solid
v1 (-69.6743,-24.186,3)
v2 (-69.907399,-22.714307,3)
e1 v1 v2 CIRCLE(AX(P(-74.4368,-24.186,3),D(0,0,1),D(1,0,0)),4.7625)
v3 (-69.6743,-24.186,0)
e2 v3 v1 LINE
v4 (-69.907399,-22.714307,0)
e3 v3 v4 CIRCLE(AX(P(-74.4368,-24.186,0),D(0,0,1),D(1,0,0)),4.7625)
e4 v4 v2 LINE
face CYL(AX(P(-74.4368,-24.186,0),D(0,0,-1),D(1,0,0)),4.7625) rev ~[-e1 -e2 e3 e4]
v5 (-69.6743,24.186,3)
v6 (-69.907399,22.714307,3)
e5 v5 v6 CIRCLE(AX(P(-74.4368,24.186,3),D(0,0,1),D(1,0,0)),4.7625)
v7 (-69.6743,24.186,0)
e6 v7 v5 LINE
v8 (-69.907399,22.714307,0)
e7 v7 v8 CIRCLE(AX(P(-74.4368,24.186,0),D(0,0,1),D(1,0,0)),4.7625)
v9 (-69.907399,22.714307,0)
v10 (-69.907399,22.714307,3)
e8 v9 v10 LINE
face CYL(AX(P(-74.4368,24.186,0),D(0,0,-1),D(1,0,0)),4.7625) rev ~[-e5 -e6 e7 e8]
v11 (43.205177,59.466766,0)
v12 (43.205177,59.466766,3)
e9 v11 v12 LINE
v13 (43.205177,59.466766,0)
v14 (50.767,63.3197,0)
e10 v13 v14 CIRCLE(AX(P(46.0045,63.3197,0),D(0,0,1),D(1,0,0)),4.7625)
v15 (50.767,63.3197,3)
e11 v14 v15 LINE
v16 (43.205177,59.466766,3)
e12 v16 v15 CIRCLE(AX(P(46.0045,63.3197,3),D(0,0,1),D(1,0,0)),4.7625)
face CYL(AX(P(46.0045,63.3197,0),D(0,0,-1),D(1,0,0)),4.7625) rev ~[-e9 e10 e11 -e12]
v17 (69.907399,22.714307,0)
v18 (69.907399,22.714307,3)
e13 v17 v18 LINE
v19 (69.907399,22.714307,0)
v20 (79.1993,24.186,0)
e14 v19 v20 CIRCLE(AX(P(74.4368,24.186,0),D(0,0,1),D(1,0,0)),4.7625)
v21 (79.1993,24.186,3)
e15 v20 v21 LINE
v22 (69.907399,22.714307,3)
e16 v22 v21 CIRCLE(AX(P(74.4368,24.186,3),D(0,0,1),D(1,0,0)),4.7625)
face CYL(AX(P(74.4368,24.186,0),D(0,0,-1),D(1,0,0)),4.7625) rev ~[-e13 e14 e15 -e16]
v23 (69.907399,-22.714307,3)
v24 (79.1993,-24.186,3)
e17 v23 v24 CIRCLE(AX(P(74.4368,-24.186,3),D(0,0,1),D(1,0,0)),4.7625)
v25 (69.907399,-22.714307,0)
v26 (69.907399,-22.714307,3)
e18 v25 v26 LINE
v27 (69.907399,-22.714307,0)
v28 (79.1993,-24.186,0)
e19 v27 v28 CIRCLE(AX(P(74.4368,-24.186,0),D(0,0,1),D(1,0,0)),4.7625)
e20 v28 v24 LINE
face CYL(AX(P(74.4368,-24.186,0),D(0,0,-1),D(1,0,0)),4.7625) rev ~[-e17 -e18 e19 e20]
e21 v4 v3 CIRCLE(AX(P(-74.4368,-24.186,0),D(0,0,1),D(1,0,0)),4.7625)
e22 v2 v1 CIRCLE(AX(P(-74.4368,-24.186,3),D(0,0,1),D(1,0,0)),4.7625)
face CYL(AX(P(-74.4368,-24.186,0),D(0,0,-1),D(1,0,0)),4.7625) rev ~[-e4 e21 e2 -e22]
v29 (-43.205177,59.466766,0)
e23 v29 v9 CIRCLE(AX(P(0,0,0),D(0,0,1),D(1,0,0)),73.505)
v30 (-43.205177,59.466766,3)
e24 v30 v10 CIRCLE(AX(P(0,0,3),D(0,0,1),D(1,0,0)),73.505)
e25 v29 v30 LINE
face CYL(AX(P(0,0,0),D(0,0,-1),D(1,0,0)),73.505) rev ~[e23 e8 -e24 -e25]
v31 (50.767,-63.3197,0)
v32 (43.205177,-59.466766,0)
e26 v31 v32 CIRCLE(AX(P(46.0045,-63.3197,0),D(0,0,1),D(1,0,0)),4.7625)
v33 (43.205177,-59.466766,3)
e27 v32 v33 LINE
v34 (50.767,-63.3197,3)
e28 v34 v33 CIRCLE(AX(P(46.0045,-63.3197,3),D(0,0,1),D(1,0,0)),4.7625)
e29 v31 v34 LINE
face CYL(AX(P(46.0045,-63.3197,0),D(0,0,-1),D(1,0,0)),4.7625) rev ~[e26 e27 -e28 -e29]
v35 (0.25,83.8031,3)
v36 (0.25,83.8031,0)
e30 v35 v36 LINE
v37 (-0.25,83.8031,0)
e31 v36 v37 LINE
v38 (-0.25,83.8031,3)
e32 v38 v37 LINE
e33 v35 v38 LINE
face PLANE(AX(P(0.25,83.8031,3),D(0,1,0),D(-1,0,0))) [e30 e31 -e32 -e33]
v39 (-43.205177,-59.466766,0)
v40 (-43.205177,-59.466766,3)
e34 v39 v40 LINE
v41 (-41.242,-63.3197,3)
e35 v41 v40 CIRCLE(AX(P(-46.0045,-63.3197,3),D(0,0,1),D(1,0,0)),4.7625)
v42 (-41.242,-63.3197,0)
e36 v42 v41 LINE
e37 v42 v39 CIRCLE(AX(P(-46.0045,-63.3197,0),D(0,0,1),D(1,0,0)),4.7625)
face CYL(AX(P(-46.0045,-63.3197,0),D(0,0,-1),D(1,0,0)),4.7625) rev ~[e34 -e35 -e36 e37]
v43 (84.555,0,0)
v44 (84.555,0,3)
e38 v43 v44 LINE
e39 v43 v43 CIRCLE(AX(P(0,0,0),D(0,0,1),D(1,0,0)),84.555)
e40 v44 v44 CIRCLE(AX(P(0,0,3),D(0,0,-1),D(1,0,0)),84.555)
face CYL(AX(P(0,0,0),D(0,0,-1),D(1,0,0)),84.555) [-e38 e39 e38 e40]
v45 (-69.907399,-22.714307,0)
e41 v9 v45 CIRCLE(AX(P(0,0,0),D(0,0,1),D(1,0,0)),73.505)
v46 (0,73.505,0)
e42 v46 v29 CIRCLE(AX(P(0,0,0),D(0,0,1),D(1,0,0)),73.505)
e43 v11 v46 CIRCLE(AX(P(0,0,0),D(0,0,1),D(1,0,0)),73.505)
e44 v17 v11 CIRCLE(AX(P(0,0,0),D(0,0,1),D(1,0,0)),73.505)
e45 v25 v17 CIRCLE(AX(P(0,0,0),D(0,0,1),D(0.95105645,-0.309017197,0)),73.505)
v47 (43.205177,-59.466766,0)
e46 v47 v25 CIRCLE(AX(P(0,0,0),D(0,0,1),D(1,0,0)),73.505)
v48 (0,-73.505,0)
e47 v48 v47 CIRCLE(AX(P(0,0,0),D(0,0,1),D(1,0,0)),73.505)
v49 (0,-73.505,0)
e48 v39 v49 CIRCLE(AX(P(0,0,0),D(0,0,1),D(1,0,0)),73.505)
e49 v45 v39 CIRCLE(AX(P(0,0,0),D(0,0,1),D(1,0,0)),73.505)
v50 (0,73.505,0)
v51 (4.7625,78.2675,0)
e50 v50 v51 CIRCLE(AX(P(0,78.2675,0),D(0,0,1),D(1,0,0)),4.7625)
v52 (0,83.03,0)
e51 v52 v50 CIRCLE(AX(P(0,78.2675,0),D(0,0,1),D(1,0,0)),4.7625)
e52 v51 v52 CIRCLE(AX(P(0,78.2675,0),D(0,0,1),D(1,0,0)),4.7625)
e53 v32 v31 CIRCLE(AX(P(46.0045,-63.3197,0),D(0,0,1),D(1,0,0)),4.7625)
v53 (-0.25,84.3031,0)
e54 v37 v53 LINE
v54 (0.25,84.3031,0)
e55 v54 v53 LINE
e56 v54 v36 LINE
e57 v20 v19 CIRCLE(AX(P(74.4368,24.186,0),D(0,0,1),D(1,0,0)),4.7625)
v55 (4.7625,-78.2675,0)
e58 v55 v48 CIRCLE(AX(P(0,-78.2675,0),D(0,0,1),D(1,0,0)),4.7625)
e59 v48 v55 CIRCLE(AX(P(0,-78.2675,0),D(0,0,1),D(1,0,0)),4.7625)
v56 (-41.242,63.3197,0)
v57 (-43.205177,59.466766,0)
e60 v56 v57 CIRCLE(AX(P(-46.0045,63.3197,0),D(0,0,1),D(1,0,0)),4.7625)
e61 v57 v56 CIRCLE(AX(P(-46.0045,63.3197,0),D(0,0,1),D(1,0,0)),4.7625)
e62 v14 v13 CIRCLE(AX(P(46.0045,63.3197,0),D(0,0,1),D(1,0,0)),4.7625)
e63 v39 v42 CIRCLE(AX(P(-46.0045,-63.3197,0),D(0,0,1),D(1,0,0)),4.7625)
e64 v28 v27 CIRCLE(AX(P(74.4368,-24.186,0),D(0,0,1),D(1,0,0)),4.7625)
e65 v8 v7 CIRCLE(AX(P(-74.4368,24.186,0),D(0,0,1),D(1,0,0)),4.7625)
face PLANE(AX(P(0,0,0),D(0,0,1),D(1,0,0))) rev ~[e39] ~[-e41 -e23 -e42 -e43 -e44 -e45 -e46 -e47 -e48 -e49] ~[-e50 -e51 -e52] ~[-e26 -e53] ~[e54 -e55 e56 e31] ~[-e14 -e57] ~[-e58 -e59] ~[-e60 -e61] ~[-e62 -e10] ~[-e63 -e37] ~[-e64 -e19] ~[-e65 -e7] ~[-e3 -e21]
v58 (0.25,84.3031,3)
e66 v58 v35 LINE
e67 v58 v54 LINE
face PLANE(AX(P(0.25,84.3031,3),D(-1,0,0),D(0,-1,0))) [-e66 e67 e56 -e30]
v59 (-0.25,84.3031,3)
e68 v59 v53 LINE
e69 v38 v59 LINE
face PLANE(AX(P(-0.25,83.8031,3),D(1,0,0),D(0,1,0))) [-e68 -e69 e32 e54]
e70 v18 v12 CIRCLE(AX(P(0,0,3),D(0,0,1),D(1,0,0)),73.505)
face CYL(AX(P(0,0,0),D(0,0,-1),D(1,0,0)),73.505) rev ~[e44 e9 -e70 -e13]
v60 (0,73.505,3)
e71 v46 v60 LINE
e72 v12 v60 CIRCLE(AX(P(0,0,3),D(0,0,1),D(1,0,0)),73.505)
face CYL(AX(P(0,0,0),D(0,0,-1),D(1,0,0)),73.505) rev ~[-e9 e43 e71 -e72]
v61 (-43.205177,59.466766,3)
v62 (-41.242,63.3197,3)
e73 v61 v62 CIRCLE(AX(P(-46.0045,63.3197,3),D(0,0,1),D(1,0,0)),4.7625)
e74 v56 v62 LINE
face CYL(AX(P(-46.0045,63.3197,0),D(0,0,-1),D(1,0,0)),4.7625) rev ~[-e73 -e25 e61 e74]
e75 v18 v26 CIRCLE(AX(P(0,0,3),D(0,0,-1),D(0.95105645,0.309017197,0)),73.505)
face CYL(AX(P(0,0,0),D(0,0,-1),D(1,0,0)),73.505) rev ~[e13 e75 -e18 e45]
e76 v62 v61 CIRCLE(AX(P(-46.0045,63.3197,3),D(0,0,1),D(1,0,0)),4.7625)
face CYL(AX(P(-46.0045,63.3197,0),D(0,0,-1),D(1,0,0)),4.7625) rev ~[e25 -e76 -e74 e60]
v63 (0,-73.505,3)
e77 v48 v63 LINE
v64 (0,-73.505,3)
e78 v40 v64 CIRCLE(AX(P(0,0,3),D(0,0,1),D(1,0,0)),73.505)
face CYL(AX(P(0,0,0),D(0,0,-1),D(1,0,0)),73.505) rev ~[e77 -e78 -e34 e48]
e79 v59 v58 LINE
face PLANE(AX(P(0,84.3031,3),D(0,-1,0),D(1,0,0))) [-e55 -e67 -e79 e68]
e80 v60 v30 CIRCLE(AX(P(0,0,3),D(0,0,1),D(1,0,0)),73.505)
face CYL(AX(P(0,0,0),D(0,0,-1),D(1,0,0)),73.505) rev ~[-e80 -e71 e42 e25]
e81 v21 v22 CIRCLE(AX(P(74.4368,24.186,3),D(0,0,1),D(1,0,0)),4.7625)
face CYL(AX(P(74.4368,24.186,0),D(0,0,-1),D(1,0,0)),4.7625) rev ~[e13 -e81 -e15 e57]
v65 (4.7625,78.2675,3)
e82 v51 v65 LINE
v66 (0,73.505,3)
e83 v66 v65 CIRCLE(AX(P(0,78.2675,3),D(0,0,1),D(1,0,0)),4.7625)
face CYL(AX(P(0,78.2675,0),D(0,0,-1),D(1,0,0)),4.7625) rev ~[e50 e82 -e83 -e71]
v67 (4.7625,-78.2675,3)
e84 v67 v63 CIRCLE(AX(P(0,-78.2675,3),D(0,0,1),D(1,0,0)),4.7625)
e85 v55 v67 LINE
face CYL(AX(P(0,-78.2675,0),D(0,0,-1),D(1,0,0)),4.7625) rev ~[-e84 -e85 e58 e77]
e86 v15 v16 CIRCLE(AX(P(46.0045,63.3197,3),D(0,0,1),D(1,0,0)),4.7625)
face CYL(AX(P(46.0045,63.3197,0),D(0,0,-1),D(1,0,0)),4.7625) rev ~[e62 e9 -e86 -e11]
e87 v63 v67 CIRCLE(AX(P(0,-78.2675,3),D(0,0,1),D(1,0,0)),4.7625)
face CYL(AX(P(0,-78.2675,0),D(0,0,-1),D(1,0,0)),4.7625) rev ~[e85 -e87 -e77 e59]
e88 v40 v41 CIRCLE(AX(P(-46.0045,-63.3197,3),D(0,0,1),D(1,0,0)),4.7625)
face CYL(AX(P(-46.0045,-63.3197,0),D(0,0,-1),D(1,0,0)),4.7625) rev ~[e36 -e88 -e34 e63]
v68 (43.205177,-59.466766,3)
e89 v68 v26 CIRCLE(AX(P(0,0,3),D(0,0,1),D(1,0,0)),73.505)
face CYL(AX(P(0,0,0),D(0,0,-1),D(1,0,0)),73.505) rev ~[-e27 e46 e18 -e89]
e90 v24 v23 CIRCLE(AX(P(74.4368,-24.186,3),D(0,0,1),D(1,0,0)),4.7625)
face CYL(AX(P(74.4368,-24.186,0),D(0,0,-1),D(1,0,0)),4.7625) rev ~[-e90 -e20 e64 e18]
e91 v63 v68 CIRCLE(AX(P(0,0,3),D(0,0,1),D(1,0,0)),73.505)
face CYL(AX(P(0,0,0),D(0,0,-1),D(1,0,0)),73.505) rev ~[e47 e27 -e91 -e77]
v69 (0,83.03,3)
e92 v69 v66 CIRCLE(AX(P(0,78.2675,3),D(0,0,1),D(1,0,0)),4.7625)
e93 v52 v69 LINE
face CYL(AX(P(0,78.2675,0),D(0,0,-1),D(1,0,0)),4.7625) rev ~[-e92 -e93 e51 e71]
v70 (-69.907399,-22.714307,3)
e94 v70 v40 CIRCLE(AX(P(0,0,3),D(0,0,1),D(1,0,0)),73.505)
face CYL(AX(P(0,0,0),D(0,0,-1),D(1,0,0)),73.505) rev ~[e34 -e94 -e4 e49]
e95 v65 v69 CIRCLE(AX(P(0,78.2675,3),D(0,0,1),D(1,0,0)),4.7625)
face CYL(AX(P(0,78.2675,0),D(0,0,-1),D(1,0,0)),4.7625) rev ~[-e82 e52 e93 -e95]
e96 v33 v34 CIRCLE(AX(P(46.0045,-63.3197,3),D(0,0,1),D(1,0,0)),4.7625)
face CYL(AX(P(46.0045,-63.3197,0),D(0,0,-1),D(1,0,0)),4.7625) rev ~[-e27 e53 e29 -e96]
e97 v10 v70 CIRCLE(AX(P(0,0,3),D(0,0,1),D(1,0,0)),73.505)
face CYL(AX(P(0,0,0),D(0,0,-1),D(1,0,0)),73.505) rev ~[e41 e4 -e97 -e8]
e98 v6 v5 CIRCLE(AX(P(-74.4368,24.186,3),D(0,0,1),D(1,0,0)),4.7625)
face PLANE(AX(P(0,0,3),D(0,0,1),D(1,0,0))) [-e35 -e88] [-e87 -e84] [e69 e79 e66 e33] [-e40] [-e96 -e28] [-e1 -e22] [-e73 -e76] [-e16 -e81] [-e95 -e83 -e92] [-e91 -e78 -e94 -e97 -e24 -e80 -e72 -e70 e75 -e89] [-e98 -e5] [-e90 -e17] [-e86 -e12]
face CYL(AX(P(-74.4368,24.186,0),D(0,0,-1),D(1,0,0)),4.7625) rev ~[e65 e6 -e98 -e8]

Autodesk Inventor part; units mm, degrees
ref_plane "YZ Plane" through (0, 0, 0) normal (1, 0, 0) x (0, 1, 0)
ref_plane "XZ Plane" through (0, 0, 0) normal (0, 1, 0) x (-1, 0, 0)
ref_plane "XY Plane" through (0, 0, 0) normal (0, 0, 1) x (1, 0, 0)
sketch "Sketch1" plane through (0, 0, 0) normal (0, 0, 1) x (1, 0, 0)
  point P0 (0, 0)
sketch "Sketch2" plane through (0, 0, 0) normal (0, 0, 1) x (1, 0, 0)
  circle A0 centre (0, 0) radius 73.505
  circle A1 centre (0, 0) radius 84.555
  line L0 (0, 0) -> (0, 267.2238)
  line L1 (0, 73.505) -> (0, 78.2675)
  circle A2 centre (0, 78.2675) radius 4.7625
  circle A3 centre (-46.0045, 63.3197) radius 4.7625
  circle A4 centre (-74.4368, 24.186) radius 4.7625
  circle A5 centre (-74.4368, -24.186) radius 4.7625
  circle A6 centre (-46.0045, -63.3197) radius 4.7625
  circle A7 centre (0, -78.2675) radius 4.7625
  circle A8 centre (46.0045, -63.3197) radius 4.7625
  circle A9 centre (74.4368, -24.186) radius 4.7625
  circle A10 centre (74.4368, 24.186) radius 4.7625
  circle A11 centre (46.0045, 63.3197) radius 4.7625
  point P0 (0, 73.505)
  point P1 (43.2052, 59.4668)
  point P2 (69.9074, 22.7143)
  point P3 (69.9074, -22.7143)
  point P4 (43.2052, -59.4668)
  point P5 (0, -73.505)
  point P6 (-43.2052, -59.4668)
  point P7 (-69.9074, -22.7143)
  point P8 (-69.9074, 22.7143)
  point P9 (-43.2052, 59.4668)
  dimension "d0" = 147.01
  dimension "d1" = 169.11
  dimension "d3" = 4.7625
  dimension "d4" = 9.525
  dimension "d7" = 360
extrude "Extrusion1" add sketch "Sketch2" along normal blind 3
sketch "Sketch3" plane through (0, 0, 3) normal (0, 0, 1) x (1, 0, 0)
  circle A0 centre (0, 0) radius 84.555 projected
  line L0 (0, 84.555) -> (0, 84.055)
  line L1 (0.25, 83.8031) -> (-0.25, 83.8031)
  line L2 (-0.25, 83.8031) -> (-0.25, 84.3031)
  line L3 (-0.25, 84.3031) -> (0.25, 84.3031)
  line L4 (0.25, 84.3031) -> (0.25, 83.8031)
  line L5 (0.25, 83.8031) -> (-0.25, 84.3031) construction
  line L6 (-0.25, 83.8031) -> (0.25, 84.3031) construction
  point P0 (0, 84.0531)
  dimension "d11" = 0.5
  dimension "d15" = 0.5
  dimension "d16" = 0.5
extrude "Extrusion2" cut sketch "Sketch3" against normal blind 10 contours L1 L2 L3 L4
properties part number "bracket 1" material "Stainless Steel"
